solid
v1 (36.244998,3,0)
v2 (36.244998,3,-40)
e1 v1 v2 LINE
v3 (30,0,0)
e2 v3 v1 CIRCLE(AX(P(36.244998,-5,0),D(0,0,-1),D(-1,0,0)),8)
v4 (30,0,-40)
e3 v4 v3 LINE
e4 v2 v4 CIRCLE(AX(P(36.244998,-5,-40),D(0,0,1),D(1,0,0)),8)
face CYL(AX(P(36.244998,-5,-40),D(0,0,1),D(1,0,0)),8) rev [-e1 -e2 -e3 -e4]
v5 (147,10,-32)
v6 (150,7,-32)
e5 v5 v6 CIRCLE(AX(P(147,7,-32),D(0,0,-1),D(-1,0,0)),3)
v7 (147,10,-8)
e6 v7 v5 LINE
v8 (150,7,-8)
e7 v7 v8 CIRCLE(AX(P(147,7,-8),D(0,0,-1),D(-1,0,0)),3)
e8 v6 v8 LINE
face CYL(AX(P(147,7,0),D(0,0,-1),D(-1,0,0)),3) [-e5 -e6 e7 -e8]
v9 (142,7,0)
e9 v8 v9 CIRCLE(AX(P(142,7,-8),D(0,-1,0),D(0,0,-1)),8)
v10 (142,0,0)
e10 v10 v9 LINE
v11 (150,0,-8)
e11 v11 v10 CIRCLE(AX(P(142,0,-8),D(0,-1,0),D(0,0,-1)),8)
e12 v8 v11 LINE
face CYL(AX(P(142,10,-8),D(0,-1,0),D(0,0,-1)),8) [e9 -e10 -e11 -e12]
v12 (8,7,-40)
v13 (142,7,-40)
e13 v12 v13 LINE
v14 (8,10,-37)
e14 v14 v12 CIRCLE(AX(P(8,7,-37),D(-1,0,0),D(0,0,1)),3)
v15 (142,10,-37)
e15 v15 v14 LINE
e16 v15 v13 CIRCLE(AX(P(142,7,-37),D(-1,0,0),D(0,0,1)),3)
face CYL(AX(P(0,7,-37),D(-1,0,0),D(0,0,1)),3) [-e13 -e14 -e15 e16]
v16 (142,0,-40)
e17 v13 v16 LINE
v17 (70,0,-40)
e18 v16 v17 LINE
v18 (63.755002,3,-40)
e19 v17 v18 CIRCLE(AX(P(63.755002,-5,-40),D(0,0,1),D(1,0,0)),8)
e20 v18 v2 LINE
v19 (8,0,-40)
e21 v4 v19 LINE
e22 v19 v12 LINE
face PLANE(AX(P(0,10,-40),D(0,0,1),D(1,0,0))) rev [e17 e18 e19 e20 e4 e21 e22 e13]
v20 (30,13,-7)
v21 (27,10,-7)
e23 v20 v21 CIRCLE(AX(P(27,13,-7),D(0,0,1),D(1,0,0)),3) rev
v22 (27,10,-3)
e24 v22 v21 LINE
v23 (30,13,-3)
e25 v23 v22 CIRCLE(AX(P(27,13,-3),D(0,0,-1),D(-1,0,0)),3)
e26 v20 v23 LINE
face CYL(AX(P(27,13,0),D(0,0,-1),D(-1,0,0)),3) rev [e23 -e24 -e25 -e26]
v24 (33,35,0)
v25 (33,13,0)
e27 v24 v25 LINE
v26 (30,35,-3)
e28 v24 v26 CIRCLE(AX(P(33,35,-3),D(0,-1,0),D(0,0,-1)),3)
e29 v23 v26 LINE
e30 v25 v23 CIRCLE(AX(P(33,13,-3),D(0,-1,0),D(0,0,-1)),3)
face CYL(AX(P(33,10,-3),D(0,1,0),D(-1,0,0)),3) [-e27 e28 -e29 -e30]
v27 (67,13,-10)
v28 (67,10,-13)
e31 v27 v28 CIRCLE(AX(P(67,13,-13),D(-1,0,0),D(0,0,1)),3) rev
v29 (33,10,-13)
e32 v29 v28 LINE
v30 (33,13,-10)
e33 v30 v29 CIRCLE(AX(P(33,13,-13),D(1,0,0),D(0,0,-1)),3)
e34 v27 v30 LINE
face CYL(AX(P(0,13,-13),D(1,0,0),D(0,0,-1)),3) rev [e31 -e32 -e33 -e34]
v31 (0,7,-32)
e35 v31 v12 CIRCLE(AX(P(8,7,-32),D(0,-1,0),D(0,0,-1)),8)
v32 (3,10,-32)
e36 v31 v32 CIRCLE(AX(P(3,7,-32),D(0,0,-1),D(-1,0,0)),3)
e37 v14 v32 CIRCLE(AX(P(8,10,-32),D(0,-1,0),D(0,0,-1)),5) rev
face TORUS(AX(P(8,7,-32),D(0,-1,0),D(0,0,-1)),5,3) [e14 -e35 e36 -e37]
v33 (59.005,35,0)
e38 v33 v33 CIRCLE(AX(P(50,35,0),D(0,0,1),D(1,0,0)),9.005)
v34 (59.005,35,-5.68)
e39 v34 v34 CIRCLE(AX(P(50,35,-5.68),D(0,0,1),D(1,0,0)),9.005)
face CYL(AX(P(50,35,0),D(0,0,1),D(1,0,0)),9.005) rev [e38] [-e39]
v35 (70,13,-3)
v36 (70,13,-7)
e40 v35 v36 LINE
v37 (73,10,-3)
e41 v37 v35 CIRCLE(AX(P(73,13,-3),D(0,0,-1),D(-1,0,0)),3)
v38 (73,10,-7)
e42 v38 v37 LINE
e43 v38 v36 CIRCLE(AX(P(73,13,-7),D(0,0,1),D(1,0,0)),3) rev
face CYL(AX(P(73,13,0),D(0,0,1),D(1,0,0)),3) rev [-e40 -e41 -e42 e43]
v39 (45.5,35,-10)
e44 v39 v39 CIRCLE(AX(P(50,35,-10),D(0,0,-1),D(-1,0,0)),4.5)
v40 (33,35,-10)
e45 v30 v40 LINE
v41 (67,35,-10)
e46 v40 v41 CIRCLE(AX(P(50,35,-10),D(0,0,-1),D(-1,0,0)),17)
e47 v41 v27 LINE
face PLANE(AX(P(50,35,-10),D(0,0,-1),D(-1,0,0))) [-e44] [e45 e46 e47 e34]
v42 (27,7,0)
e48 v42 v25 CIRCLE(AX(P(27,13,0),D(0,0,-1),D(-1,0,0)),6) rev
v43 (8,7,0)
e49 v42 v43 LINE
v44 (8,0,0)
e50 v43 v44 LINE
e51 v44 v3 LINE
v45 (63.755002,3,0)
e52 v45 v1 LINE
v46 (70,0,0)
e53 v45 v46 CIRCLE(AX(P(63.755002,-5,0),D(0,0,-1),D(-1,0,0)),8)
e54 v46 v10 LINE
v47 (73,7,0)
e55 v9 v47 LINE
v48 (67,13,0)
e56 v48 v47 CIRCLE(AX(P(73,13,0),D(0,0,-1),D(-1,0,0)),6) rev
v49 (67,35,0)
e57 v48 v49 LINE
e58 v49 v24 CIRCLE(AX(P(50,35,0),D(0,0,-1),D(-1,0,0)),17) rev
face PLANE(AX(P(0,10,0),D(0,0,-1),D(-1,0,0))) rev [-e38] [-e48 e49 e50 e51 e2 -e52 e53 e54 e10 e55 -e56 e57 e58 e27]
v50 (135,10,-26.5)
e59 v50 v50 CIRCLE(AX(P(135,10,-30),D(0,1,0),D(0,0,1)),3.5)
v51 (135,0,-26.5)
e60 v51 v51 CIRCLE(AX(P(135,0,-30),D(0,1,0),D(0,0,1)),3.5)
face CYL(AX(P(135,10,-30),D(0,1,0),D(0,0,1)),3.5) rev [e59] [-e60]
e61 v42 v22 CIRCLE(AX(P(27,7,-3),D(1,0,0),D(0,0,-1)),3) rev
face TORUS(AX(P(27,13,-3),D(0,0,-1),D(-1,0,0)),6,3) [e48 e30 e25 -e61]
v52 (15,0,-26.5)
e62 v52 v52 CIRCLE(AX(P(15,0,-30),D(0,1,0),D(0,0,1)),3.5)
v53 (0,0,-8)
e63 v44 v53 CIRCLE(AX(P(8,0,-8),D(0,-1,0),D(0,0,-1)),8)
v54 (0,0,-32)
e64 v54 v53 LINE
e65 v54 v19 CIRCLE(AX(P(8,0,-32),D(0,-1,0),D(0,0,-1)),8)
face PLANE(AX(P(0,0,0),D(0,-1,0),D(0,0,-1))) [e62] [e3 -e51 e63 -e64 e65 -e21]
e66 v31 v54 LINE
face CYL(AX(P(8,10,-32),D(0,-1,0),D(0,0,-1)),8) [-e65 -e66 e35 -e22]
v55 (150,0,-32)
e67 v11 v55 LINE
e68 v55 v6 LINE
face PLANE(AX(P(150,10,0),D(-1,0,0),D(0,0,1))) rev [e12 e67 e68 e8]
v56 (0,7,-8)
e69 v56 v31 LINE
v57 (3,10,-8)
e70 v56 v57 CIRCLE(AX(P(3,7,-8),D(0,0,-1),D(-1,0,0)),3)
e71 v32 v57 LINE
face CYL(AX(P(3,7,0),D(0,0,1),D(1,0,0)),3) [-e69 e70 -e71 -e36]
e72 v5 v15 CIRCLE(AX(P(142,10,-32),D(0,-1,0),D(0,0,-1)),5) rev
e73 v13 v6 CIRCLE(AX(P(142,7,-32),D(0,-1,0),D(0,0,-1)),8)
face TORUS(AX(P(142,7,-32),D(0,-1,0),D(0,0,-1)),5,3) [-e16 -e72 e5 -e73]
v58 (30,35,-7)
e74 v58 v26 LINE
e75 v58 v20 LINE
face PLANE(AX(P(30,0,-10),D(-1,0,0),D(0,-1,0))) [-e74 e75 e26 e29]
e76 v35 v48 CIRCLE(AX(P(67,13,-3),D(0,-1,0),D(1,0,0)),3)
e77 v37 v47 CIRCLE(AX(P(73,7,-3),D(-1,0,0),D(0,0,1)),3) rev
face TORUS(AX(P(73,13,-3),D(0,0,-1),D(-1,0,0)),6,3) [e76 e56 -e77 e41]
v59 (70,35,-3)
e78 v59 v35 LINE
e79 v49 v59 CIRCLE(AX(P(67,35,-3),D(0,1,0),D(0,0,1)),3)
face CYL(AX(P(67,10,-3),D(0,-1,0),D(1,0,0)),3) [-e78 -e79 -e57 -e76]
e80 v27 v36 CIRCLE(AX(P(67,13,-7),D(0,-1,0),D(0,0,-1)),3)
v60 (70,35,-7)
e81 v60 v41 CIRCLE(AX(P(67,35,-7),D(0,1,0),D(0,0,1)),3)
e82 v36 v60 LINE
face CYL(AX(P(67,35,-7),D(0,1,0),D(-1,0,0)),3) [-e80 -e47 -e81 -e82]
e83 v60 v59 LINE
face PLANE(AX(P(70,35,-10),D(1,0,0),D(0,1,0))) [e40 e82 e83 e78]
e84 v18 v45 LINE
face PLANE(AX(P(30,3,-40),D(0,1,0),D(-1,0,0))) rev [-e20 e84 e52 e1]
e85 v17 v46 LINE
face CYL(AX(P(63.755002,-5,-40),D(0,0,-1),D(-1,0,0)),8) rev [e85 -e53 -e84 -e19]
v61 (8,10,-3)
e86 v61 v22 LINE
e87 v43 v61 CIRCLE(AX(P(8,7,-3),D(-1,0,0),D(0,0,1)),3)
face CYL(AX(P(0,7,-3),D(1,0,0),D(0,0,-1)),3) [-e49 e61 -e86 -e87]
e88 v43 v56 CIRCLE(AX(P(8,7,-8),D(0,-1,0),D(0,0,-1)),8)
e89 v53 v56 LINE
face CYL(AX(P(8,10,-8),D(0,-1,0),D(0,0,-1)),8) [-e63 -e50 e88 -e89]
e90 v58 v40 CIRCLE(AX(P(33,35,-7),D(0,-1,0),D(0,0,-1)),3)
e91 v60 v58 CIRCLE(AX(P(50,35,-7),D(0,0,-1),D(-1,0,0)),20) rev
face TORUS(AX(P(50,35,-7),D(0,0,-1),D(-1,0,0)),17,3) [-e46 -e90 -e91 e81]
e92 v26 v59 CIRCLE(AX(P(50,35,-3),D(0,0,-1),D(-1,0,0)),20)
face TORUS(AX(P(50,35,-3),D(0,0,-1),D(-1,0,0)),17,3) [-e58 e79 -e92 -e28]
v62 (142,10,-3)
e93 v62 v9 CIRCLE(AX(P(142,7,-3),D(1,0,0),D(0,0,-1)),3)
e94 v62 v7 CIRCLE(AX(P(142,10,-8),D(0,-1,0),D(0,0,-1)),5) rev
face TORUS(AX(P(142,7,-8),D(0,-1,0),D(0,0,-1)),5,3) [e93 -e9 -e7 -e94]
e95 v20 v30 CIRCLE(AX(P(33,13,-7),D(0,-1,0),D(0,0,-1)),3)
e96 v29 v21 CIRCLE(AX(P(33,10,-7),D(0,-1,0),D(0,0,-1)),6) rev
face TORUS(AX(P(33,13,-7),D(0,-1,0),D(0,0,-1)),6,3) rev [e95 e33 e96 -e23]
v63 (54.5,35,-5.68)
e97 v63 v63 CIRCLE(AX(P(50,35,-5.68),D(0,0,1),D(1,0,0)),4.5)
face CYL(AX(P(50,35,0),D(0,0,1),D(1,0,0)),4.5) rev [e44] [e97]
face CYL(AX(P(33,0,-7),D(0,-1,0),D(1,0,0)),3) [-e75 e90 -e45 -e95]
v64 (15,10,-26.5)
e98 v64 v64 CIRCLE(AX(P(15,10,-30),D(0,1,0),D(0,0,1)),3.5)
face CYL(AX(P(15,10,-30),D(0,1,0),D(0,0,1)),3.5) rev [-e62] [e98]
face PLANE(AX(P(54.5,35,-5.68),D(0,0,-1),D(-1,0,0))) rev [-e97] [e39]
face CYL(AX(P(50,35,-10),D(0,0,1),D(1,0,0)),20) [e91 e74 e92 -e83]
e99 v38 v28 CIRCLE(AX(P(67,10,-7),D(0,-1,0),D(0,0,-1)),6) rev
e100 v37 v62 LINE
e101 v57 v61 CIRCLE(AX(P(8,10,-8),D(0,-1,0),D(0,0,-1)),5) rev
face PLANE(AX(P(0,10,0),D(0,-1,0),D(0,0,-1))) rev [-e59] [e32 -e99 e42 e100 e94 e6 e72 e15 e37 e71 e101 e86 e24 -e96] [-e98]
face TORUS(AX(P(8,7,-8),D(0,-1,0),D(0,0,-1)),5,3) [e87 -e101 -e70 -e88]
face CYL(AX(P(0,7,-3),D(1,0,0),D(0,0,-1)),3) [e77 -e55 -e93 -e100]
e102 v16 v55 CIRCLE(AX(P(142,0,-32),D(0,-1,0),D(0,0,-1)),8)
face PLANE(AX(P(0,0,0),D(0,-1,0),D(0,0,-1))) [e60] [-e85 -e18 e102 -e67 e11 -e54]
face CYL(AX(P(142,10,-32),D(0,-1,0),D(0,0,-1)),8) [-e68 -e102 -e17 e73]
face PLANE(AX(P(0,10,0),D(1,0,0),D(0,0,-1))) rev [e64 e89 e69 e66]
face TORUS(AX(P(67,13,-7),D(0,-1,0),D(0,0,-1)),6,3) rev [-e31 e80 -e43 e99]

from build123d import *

# Parameters (mm, degrees)
SKETCH_1_W                   = 150
SKETCH_1_H                   = 40
BASEPLATE_DEPTH              = 10
VERTBOSS_DEPTH               = 10
SKETCH_3_W                   = 40
SKETCH_3_H                   = 3
BOTTOMSOLT_DEPTH             = 165.69669092
HOLE_WIZARD_M8_1_D           = 9
HOLE_WIZARD_M8_1_CBORE_D     = 18.01
HOLE_WIZARD_M8_1_CBORE_DEPTH = 5.68
HOLE_WIZARD_7_0_7_1_D        = 7
FILLET_1_R                   = 8
FILLET_2_R                   = 3


with BuildPart() as part:
    # 草圖1 → BasePlate (new body)
    with BuildSketch(Plane(origin=(0, 0, 0), x_dir=(1, 0, 0), z_dir=(0, 1, 0))):
        with Locations((75, 20)):
            Rectangle(SKETCH_1_W, SKETCH_1_H)
    extrude(amount=BASEPLATE_DEPTH)

    # 草圖2 → VertBoss (add)
    with BuildSketch(Plane.XY):
        with BuildLine():
            Line((30, 0), (30, 35))
            ThreePointArc((30, 35), (50, 55), (70, 35))
            Line((70, 35), (70, 0))
            Line((70, 0), (30, 0))
        make_face()
    extrude(amount=-VERTBOSS_DEPTH)

    # 草圖3 → BottomSolt (cut, through all)
    with BuildSketch(Plane.XY):
        with Locations((50, 1.5)):
            Rectangle(SKETCH_3_W, SKETCH_3_H)
    extrude(amount=-BOTTOMSOLT_DEPTH, mode=Mode.SUBTRACT)

    # M8 六角頭螺栓的柱孔1 (through all)
    with Locations(Plane.XY):
        with Locations((50, 35)):
            CounterBoreHole(HOLE_WIZARD_M8_1_D / 2, HOLE_WIZARD_M8_1_CBORE_D / 2, HOLE_WIZARD_M8_1_CBORE_DEPTH)

    # Ø7.0 (7) 直徑孔1 (through all)
    with Locations(Plane(origin=(0, 10, 0), x_dir=(1, 0, 0), z_dir=(0, 1, 0))):
        with Locations((15, 30), (135, 30)):
            Hole(HOLE_WIZARD_7_0_7_1_D / 2)

    # 圓角1
    # the kernel refuses this fillet: 8 mm, written as the material it adds along each edge
    with BuildSketch(Plane(origin=(70, 3, 0), x_dir=(-1, 0, 0), z_dir=(0, 0, -1))) as fillet_1_piece_1:
        with BuildLine():
            CenterArc((6.244997998, -8), FILLET_1_R, 90, 51.317812547)
            Line((0, -3), (0, 0))
            Line((0, 0), (6.244997998, 0))
        make_face()
    extrude(amount=40)
    with BuildSketch(Plane(origin=(30, 3, 0), x_dir=(0, -1, 0), z_dir=(0, 0, -1))) as fillet_1_piece_2:
        with BuildLine():
            CenterArc((8, -6.244997998), FILLET_1_R, 128.682187453, 51.317812547)
            Line((0, -6.244997998), (0, 0))
            Line((0, 0), (3, 0))
        make_face()
    extrude(amount=40)
    # the kernel refuses this fillet: 8 mm, written as the material it takes off along each edge
    with BuildSketch(Plane(origin=(0, -20, 0), x_dir=(1, 0, 0), z_dir=(0, 1, 0)), Plane(origin=(0, -20, -40), x_dir=(0, 0, 1), z_dir=(0, 1, 0))) as fillet_1_2_piece_1:
        with BuildLine():
            CenterArc((FILLET_1_R, FILLET_1_R), FILLET_1_R, 180, 90)
            Line((0, FILLET_1_R), (0, 0))
            Line((0, 0), (FILLET_1_R, 0))
        make_face()
    extrude(amount=50, mode=Mode.SUBTRACT)
    with BuildSketch(Plane(origin=(150, -20, 0), x_dir=(-1, 0, 0), z_dir=(0, 1, 0)), Plane(origin=(150, -20, -40), x_dir=(0, 0, 1), z_dir=(0, 1, 0))) as fillet_1_2_piece_2:
        with BuildLine():
            CenterArc((FILLET_1_R, -FILLET_1_R), FILLET_1_R, 90, 90)
            Line((0, -FILLET_1_R), (0, 0))
            Line((0, 0), (FILLET_1_R, 0))
        make_face()
    extrude(amount=50, mode=Mode.SUBTRACT)

    # 圓角2
    fillet_2_edges = [part.edges().sort_by_distance(p)[0] for p in [
        (106, 10, 0),
        (30, 22.5, -10),
        (70, 22.5, -10),
        (30, 22.5, 0),
        (70, 22.5, 0),
        (50, 55, 0),
        (30, 10, -5),
        (50, 55, -10),
        (70, 10, -5),
        (50, 10, -10),
        (19, 10, 0),
        (0, 10, -20),
        (150, 10, -20),
        (75, 10, -40),
        (147.656854249, 10, -37.656854249),
        (147.656854249, 10, -2.343145751),
        (2.343145751, 10, -37.656854249),
        (2.343145751, 10, -2.343145751),
    ]]
    fillet(fillet_2_edges, radius=FILLET_2_R)


solid = part.part
